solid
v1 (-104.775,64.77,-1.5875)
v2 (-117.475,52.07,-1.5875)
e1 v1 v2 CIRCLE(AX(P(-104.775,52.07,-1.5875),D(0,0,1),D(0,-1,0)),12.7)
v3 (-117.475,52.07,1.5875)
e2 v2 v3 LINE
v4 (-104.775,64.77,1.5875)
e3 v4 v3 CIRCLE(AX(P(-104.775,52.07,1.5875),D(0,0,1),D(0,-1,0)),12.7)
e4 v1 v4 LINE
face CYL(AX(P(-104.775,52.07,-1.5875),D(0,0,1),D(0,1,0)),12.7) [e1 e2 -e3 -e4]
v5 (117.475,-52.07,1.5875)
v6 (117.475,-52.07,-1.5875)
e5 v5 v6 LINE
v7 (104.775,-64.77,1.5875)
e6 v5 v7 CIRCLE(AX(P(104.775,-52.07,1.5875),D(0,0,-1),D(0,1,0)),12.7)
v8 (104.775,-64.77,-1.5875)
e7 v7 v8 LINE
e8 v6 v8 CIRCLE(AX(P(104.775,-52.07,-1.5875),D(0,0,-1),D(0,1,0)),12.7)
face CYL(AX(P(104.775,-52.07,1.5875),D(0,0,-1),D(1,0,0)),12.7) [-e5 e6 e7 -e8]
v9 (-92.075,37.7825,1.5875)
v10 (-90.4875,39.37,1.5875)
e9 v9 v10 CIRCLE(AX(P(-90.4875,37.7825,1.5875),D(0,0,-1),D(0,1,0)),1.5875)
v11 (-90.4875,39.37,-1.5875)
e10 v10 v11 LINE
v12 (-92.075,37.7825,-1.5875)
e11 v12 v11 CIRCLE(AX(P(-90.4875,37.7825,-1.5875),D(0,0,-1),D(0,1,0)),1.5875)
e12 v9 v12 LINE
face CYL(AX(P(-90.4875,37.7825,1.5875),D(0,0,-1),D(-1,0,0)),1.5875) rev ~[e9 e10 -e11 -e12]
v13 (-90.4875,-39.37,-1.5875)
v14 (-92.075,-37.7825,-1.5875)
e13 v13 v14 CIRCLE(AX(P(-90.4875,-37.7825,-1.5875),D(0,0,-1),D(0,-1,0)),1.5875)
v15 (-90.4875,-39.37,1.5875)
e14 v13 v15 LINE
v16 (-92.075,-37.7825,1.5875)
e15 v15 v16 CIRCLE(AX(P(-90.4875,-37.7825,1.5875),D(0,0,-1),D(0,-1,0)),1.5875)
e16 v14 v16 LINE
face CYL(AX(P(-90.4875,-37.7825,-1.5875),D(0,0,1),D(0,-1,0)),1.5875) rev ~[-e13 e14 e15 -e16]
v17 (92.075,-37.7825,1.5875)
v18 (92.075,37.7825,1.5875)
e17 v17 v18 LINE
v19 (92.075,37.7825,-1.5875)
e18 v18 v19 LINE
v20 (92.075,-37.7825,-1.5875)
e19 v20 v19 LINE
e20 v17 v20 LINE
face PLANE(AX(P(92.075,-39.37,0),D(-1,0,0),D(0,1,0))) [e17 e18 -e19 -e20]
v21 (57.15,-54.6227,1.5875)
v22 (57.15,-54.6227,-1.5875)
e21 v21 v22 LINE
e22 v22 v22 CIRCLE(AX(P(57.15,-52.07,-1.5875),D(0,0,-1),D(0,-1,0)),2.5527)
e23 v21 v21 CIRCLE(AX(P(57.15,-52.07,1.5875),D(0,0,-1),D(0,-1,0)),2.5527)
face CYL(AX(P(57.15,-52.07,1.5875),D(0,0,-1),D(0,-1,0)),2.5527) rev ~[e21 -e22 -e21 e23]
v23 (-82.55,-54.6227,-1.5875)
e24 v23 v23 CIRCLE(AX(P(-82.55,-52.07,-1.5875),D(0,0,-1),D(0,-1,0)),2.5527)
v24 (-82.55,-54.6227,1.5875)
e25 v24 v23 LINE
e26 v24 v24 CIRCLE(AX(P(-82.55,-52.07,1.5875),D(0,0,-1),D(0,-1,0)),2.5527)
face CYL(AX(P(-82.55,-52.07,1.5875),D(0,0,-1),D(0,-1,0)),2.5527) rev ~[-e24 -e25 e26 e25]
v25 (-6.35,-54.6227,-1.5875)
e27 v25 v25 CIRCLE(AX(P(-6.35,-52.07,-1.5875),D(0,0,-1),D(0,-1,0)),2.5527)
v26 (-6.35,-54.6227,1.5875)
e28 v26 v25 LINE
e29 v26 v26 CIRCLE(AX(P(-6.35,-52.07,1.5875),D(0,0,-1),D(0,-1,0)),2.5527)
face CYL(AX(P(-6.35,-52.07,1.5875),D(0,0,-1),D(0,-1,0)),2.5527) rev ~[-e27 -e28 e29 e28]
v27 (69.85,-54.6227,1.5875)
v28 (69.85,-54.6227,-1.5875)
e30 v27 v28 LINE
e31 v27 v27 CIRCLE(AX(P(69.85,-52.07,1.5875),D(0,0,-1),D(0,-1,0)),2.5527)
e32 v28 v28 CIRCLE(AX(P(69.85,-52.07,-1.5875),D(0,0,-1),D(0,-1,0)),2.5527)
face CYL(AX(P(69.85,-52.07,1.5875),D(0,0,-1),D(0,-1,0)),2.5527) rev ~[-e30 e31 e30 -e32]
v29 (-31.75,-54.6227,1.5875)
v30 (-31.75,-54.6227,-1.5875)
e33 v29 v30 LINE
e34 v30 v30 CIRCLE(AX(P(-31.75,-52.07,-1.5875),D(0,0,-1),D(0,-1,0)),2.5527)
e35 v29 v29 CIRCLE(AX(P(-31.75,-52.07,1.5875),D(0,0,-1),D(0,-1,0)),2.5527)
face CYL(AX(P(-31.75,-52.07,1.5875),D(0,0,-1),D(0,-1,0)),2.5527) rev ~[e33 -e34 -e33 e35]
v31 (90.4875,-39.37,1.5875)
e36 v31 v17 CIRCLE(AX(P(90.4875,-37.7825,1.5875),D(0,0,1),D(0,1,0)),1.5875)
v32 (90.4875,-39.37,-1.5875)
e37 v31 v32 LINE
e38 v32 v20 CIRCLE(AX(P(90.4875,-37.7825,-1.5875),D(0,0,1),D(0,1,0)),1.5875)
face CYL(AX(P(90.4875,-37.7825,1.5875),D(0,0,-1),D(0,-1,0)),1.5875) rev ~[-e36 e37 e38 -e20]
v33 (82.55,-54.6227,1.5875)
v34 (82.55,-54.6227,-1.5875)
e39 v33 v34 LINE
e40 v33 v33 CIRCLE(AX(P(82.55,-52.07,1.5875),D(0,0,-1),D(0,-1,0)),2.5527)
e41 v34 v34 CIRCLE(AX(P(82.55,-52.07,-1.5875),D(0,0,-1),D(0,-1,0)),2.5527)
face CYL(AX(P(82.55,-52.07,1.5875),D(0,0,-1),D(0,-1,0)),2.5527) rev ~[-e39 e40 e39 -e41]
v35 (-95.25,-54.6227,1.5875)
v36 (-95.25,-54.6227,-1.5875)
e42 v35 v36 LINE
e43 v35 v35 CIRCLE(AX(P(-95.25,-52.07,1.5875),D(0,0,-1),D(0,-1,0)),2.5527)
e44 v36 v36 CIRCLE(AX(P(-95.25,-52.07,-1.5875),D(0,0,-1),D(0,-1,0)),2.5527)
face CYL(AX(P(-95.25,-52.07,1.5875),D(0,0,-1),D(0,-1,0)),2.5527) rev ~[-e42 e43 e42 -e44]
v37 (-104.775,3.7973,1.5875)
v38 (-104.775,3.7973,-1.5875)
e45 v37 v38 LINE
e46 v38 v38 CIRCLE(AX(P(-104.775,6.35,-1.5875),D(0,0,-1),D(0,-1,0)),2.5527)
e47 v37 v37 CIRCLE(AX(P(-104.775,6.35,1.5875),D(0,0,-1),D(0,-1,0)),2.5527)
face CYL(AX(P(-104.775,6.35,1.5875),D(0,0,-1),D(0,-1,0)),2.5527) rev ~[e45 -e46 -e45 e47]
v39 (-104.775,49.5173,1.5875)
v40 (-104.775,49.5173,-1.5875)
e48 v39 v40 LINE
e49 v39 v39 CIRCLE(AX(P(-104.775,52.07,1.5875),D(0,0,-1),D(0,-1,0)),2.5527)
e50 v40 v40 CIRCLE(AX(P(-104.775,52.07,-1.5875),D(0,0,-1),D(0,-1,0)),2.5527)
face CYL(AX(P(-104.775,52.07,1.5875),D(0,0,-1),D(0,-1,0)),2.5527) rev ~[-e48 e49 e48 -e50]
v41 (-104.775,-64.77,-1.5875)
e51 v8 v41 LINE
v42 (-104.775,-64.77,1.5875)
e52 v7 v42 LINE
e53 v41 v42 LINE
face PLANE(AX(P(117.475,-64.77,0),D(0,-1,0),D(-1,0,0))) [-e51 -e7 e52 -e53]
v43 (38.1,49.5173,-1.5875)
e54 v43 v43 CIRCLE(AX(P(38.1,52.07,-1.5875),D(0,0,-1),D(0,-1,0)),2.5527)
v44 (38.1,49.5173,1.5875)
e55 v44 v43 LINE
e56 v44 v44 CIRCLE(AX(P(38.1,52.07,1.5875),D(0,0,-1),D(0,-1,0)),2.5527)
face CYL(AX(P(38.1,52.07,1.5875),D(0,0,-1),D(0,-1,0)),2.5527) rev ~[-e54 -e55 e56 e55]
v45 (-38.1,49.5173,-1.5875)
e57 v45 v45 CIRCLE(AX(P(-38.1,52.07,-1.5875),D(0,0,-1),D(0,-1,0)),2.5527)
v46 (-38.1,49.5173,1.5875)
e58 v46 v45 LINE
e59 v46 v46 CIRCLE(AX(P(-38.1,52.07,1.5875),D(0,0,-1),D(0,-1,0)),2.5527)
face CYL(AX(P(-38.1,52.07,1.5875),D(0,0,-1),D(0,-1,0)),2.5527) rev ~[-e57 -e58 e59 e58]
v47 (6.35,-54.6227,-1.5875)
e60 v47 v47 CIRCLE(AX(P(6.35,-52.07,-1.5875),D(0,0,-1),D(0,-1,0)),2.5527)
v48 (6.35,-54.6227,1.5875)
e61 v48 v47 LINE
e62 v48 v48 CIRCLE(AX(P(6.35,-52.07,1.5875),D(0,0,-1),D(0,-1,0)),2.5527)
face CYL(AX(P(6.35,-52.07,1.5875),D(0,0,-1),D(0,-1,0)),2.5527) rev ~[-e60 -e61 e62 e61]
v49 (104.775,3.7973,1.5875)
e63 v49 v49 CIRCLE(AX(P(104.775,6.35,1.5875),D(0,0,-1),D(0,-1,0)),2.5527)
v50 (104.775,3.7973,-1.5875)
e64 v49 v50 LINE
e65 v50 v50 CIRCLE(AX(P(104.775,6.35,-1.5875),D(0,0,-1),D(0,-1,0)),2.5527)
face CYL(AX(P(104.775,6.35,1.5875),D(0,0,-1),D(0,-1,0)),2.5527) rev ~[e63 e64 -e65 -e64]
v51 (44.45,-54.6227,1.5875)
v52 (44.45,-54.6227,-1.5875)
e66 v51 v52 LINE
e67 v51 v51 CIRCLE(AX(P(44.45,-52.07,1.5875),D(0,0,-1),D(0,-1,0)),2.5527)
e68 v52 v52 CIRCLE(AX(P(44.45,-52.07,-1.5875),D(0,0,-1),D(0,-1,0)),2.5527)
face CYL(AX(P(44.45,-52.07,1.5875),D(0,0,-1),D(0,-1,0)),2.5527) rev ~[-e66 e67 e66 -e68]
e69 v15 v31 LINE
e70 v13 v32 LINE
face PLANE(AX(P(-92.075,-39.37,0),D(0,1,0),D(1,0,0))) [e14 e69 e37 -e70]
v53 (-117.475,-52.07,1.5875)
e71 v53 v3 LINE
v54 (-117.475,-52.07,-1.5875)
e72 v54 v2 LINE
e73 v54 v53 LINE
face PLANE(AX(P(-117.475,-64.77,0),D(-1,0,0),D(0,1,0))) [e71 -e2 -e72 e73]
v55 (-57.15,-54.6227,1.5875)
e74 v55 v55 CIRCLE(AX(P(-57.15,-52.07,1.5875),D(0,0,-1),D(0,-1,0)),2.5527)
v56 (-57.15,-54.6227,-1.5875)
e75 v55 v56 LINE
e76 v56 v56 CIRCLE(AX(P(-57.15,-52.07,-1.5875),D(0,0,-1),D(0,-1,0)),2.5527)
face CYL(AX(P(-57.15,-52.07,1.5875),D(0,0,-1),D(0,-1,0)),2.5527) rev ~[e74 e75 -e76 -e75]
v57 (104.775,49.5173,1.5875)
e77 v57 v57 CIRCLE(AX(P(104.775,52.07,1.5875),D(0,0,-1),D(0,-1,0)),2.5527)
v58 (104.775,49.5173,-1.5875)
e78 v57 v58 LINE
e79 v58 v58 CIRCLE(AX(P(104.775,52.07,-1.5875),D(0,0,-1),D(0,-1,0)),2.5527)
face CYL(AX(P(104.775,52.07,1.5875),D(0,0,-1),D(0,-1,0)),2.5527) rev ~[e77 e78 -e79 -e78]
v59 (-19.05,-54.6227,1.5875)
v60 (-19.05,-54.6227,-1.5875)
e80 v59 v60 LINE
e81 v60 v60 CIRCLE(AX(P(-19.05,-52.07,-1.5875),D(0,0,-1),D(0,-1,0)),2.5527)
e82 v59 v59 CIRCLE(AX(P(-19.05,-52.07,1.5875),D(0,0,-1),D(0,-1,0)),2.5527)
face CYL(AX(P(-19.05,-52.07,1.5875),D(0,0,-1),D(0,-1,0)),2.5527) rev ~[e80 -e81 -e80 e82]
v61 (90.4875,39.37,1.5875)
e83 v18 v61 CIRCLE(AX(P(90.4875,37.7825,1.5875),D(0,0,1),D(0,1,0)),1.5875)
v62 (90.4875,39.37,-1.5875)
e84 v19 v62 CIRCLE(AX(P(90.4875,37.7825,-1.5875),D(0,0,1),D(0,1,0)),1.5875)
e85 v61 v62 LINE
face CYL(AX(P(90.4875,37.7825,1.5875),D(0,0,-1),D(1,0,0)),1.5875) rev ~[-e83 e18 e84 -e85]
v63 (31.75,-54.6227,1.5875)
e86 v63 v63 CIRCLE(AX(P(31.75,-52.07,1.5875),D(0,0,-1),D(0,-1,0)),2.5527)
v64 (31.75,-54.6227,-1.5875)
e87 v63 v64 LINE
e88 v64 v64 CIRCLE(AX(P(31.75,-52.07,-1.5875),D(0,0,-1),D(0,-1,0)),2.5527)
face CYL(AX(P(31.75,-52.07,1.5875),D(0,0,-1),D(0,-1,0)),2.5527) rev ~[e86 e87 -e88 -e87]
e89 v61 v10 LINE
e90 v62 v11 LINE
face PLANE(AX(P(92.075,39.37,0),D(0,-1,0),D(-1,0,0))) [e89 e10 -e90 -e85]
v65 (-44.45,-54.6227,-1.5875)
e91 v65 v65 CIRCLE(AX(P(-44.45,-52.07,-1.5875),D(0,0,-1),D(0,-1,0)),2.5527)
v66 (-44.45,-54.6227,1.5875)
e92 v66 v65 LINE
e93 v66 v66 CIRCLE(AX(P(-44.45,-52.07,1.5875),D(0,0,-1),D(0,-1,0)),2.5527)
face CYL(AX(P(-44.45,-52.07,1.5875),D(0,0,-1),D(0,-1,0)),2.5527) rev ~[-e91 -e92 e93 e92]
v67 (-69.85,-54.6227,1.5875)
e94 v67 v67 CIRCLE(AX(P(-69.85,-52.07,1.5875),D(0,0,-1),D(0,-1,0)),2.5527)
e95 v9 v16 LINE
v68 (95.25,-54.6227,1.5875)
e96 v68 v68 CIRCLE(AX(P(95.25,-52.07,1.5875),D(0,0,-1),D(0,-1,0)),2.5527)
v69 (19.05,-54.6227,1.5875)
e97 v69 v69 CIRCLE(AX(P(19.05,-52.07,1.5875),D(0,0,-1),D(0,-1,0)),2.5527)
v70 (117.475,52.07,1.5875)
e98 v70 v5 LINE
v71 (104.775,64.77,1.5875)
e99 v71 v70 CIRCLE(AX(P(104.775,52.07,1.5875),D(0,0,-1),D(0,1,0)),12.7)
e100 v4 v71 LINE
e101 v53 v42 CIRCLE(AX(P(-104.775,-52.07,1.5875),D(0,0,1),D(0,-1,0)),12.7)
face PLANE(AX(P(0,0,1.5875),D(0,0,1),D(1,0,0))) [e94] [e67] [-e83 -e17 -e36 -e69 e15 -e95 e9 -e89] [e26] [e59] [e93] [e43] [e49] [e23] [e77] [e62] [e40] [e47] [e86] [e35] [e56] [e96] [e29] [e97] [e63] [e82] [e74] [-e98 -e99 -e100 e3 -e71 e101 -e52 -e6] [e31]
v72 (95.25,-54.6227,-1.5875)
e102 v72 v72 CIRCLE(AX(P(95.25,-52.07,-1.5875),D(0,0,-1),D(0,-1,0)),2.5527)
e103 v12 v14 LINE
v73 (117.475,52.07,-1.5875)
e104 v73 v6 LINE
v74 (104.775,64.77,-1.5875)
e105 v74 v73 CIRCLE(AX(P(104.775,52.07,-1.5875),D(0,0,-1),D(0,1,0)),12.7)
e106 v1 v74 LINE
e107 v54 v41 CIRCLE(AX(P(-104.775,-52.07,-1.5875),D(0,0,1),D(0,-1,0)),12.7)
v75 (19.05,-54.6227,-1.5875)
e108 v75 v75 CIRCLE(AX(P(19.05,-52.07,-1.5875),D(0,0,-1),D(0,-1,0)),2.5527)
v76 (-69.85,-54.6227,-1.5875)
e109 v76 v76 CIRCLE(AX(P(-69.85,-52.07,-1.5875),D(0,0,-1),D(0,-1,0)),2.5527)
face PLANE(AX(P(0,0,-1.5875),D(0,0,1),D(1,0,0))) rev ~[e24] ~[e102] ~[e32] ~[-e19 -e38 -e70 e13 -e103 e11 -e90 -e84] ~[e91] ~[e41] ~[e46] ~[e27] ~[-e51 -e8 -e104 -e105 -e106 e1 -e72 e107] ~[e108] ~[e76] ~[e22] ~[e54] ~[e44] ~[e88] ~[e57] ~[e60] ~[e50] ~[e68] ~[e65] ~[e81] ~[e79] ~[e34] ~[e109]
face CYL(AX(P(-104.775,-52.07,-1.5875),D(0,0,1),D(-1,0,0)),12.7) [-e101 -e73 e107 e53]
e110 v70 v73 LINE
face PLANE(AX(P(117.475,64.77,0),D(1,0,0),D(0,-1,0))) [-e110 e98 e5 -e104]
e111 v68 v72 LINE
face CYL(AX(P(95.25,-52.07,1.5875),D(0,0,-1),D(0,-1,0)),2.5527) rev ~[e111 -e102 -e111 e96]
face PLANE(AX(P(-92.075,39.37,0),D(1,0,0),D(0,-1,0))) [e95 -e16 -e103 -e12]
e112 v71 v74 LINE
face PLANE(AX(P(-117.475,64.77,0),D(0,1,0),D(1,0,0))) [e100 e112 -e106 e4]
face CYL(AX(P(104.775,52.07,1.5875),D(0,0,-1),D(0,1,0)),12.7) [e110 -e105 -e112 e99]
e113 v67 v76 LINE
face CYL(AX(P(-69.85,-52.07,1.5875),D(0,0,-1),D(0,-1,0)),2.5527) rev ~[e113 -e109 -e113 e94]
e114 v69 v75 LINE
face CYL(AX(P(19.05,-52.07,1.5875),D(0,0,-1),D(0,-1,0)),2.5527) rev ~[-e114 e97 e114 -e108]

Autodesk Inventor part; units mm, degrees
ref_plane "YZ Plane" through (0, 0, 0) normal (1, 0, 0) x (0, 1, 0)
ref_plane "XZ Plane" through (0, 0, 0) normal (0, 1, 0) x (-1, 0, 0)
ref_plane "XY Plane" through (0, 0, 0) normal (0, 0, 1) x (1, 0, 0)
sketch "Sketch1" plane through (0, 0, 0) normal (0, 0, 1) x (1, 0, 0)
  line L0 (-92.075, -39.37) -> (92.075, -39.37)
  line L1 (92.075, -39.37) -> (92.075, 39.37)
  line L2 (92.075, 39.37) -> (-92.075, 39.37)
  line L3 (-92.075, 39.37) -> (-92.075, -39.37)
  line L4 (-92.075, -39.37) -> (92.075, 39.37) construction
  line L5 (92.075, -39.37) -> (-92.075, 39.37) construction
  line L6 (-117.475, 64.77) -> (117.475, 64.77)
  line L7 (117.475, 64.77) -> (117.475, -64.77)
  line L8 (117.475, -64.77) -> (-117.475, -64.77)
  line L9 (-117.475, -64.77) -> (-117.475, 64.77)
  point P0 (0, 0)
  dimension "d0" = 184.15
  dimension "d1" = 78.74
  dimension "d2" = 25.4
extrude "Plate1" add sketch "Sketch1" along normal mid plane 3.175
sketch "Sketch2" plane through (0, 0, 1.5875) normal (0, 0, 1) x (1, 0, 0)
  line L0 (-92.075, -39.37) -> (-92.075, 39.37) construction
  line L1 (-92.075, 39.37) -> (92.075, 39.37) construction
  line L2 (92.075, 39.37) -> (92.075, -39.37) construction
  line L3 (92.075, -39.37) -> (-92.075, -39.37) construction
  line L4 (104.775, 52.07) -> (-104.775, 52.07) construction
  line L5 (-104.775, 52.07) -> (-104.775, -52.07) construction
  line L6 (-104.775, -52.07) -> (104.775, -52.07) construction
  line L7 (104.775, -52.07) -> (104.775, 52.07) construction
  line L8 (0, 90.678) -> (0, -90.678) construction
  point P0 (0, 0)
  point P1 (-95.25, -52.07)
  point P2 (-82.55, -52.07)
  point P3 (-69.85, -52.07)
  point P4 (-57.15, -52.07)
  point P5 (-44.45, -52.07)
  point P6 (-31.75, -52.07)
  point P7 (-19.05, -52.07)
  point P8 (-6.35, -52.07)
  point P9 (6.35, -52.07)
  point P10 (19.05, -52.07)
  point P11 (31.75, -52.07)
  point P12 (44.45, -52.07)
  point P13 (57.15, -52.07)
  point P14 (69.85, -52.07)
  point P15 (82.55, -52.07)
  point P16 (95.25, -52.07)
  point P17 (-38.1, 52.07)
  point P18 (38.1, 52.07)
  point P19 (-104.775, 6.35)
  point P20 (104.775, 6.35)
  dimension "d4" = 12.7
  dimension "d16" = 12.7
  dimension "d21" = 9.525
  dimension "d22" = 9.525
  dimension "d23" = 66.675
  dimension "d24" = 66.675
  dimension "d25" = 76.2
  dimension "d26" = 45.72
  dimension "d28" = 45.72
hole "Hole1" at (-104.775, 52.07, 1.5875) at (104.775, 52.07, 1.5875) at (-95.25, -52.07, 1.5875) at (-82.55, -52.07, 1.5875) at (-69.85, -52.07, 1.5875) at (-57.15, -52.07, 1.5875) at (-44.45, -52.07, 1.5875) at (-31.75, -52.07, 1.5875) at (-19.05, -52.07, 1.5875) at (-6.35, -52.07, 1.5875) at (6.35, -52.07, 1.5875) at (19.05, -52.07, 1.5875) at (31.75, -52.07, 1.5875) at (44.45, -52.07, 1.5875) at (57.15, -52.07, 1.5875) at (69.85, -52.07, 1.5875) at (82.55, -52.07, 1.5875) at (95.25, -52.07, 1.5875) at (-38.1, 52.07, 1.5875) at (38.1, 52.07, 1.5875) at (-104.775, 6.35, 1.5875) at (104.775, 6.35, 1.5875) direction (0, 0, -1) diameter 5.1054 end through all clearance for "Flat Head Machine Screw (82)" size "#10" standard "Ansi Unified Screw Threads"
fillet "Corner Round1" radius 1.5875 4 edges at (-92.075, -39.37, 0) (-92.075, 39.37, 0) (92.075, 39.37, 0) (92.075, -39.37, 0)
fillet "Corner Round2" radius 12.7 4 edges at (-117.475, 64.77, 0) (117.475, 64.77, 0) (117.475, -64.77, 0) (-117.475, -64.77, 0)
equation "\"d21\" = d22"
equation "\"d23\" = d24"
equation "\"d28\" = d26"
equation "\"d34\" = Thickness"
equation "\"d3\" = Thickness"
equation "\"BendRadius\" = Thickness"
equation "\"BendReliefWidth\" = Thickness"
equation "\"BendReliefDepth\" = 0.5 * Thickness"
equation "\"CornerReliefSize\" = 4 * Thickness"
equation "\"MinimumRemnant\" = 2 * Thickness"
equation "\"TransitionRadius\" = BendRadius"
equation "\"JacobiRadiusSize\" = BendRadius"
equation "\"GapSize\" = Thickness"
equation "\"Thickness\" = 3.175"
properties part number "PLATE,MOUNT,BATTERY,TOP" material "Aluminum 3003-O"
